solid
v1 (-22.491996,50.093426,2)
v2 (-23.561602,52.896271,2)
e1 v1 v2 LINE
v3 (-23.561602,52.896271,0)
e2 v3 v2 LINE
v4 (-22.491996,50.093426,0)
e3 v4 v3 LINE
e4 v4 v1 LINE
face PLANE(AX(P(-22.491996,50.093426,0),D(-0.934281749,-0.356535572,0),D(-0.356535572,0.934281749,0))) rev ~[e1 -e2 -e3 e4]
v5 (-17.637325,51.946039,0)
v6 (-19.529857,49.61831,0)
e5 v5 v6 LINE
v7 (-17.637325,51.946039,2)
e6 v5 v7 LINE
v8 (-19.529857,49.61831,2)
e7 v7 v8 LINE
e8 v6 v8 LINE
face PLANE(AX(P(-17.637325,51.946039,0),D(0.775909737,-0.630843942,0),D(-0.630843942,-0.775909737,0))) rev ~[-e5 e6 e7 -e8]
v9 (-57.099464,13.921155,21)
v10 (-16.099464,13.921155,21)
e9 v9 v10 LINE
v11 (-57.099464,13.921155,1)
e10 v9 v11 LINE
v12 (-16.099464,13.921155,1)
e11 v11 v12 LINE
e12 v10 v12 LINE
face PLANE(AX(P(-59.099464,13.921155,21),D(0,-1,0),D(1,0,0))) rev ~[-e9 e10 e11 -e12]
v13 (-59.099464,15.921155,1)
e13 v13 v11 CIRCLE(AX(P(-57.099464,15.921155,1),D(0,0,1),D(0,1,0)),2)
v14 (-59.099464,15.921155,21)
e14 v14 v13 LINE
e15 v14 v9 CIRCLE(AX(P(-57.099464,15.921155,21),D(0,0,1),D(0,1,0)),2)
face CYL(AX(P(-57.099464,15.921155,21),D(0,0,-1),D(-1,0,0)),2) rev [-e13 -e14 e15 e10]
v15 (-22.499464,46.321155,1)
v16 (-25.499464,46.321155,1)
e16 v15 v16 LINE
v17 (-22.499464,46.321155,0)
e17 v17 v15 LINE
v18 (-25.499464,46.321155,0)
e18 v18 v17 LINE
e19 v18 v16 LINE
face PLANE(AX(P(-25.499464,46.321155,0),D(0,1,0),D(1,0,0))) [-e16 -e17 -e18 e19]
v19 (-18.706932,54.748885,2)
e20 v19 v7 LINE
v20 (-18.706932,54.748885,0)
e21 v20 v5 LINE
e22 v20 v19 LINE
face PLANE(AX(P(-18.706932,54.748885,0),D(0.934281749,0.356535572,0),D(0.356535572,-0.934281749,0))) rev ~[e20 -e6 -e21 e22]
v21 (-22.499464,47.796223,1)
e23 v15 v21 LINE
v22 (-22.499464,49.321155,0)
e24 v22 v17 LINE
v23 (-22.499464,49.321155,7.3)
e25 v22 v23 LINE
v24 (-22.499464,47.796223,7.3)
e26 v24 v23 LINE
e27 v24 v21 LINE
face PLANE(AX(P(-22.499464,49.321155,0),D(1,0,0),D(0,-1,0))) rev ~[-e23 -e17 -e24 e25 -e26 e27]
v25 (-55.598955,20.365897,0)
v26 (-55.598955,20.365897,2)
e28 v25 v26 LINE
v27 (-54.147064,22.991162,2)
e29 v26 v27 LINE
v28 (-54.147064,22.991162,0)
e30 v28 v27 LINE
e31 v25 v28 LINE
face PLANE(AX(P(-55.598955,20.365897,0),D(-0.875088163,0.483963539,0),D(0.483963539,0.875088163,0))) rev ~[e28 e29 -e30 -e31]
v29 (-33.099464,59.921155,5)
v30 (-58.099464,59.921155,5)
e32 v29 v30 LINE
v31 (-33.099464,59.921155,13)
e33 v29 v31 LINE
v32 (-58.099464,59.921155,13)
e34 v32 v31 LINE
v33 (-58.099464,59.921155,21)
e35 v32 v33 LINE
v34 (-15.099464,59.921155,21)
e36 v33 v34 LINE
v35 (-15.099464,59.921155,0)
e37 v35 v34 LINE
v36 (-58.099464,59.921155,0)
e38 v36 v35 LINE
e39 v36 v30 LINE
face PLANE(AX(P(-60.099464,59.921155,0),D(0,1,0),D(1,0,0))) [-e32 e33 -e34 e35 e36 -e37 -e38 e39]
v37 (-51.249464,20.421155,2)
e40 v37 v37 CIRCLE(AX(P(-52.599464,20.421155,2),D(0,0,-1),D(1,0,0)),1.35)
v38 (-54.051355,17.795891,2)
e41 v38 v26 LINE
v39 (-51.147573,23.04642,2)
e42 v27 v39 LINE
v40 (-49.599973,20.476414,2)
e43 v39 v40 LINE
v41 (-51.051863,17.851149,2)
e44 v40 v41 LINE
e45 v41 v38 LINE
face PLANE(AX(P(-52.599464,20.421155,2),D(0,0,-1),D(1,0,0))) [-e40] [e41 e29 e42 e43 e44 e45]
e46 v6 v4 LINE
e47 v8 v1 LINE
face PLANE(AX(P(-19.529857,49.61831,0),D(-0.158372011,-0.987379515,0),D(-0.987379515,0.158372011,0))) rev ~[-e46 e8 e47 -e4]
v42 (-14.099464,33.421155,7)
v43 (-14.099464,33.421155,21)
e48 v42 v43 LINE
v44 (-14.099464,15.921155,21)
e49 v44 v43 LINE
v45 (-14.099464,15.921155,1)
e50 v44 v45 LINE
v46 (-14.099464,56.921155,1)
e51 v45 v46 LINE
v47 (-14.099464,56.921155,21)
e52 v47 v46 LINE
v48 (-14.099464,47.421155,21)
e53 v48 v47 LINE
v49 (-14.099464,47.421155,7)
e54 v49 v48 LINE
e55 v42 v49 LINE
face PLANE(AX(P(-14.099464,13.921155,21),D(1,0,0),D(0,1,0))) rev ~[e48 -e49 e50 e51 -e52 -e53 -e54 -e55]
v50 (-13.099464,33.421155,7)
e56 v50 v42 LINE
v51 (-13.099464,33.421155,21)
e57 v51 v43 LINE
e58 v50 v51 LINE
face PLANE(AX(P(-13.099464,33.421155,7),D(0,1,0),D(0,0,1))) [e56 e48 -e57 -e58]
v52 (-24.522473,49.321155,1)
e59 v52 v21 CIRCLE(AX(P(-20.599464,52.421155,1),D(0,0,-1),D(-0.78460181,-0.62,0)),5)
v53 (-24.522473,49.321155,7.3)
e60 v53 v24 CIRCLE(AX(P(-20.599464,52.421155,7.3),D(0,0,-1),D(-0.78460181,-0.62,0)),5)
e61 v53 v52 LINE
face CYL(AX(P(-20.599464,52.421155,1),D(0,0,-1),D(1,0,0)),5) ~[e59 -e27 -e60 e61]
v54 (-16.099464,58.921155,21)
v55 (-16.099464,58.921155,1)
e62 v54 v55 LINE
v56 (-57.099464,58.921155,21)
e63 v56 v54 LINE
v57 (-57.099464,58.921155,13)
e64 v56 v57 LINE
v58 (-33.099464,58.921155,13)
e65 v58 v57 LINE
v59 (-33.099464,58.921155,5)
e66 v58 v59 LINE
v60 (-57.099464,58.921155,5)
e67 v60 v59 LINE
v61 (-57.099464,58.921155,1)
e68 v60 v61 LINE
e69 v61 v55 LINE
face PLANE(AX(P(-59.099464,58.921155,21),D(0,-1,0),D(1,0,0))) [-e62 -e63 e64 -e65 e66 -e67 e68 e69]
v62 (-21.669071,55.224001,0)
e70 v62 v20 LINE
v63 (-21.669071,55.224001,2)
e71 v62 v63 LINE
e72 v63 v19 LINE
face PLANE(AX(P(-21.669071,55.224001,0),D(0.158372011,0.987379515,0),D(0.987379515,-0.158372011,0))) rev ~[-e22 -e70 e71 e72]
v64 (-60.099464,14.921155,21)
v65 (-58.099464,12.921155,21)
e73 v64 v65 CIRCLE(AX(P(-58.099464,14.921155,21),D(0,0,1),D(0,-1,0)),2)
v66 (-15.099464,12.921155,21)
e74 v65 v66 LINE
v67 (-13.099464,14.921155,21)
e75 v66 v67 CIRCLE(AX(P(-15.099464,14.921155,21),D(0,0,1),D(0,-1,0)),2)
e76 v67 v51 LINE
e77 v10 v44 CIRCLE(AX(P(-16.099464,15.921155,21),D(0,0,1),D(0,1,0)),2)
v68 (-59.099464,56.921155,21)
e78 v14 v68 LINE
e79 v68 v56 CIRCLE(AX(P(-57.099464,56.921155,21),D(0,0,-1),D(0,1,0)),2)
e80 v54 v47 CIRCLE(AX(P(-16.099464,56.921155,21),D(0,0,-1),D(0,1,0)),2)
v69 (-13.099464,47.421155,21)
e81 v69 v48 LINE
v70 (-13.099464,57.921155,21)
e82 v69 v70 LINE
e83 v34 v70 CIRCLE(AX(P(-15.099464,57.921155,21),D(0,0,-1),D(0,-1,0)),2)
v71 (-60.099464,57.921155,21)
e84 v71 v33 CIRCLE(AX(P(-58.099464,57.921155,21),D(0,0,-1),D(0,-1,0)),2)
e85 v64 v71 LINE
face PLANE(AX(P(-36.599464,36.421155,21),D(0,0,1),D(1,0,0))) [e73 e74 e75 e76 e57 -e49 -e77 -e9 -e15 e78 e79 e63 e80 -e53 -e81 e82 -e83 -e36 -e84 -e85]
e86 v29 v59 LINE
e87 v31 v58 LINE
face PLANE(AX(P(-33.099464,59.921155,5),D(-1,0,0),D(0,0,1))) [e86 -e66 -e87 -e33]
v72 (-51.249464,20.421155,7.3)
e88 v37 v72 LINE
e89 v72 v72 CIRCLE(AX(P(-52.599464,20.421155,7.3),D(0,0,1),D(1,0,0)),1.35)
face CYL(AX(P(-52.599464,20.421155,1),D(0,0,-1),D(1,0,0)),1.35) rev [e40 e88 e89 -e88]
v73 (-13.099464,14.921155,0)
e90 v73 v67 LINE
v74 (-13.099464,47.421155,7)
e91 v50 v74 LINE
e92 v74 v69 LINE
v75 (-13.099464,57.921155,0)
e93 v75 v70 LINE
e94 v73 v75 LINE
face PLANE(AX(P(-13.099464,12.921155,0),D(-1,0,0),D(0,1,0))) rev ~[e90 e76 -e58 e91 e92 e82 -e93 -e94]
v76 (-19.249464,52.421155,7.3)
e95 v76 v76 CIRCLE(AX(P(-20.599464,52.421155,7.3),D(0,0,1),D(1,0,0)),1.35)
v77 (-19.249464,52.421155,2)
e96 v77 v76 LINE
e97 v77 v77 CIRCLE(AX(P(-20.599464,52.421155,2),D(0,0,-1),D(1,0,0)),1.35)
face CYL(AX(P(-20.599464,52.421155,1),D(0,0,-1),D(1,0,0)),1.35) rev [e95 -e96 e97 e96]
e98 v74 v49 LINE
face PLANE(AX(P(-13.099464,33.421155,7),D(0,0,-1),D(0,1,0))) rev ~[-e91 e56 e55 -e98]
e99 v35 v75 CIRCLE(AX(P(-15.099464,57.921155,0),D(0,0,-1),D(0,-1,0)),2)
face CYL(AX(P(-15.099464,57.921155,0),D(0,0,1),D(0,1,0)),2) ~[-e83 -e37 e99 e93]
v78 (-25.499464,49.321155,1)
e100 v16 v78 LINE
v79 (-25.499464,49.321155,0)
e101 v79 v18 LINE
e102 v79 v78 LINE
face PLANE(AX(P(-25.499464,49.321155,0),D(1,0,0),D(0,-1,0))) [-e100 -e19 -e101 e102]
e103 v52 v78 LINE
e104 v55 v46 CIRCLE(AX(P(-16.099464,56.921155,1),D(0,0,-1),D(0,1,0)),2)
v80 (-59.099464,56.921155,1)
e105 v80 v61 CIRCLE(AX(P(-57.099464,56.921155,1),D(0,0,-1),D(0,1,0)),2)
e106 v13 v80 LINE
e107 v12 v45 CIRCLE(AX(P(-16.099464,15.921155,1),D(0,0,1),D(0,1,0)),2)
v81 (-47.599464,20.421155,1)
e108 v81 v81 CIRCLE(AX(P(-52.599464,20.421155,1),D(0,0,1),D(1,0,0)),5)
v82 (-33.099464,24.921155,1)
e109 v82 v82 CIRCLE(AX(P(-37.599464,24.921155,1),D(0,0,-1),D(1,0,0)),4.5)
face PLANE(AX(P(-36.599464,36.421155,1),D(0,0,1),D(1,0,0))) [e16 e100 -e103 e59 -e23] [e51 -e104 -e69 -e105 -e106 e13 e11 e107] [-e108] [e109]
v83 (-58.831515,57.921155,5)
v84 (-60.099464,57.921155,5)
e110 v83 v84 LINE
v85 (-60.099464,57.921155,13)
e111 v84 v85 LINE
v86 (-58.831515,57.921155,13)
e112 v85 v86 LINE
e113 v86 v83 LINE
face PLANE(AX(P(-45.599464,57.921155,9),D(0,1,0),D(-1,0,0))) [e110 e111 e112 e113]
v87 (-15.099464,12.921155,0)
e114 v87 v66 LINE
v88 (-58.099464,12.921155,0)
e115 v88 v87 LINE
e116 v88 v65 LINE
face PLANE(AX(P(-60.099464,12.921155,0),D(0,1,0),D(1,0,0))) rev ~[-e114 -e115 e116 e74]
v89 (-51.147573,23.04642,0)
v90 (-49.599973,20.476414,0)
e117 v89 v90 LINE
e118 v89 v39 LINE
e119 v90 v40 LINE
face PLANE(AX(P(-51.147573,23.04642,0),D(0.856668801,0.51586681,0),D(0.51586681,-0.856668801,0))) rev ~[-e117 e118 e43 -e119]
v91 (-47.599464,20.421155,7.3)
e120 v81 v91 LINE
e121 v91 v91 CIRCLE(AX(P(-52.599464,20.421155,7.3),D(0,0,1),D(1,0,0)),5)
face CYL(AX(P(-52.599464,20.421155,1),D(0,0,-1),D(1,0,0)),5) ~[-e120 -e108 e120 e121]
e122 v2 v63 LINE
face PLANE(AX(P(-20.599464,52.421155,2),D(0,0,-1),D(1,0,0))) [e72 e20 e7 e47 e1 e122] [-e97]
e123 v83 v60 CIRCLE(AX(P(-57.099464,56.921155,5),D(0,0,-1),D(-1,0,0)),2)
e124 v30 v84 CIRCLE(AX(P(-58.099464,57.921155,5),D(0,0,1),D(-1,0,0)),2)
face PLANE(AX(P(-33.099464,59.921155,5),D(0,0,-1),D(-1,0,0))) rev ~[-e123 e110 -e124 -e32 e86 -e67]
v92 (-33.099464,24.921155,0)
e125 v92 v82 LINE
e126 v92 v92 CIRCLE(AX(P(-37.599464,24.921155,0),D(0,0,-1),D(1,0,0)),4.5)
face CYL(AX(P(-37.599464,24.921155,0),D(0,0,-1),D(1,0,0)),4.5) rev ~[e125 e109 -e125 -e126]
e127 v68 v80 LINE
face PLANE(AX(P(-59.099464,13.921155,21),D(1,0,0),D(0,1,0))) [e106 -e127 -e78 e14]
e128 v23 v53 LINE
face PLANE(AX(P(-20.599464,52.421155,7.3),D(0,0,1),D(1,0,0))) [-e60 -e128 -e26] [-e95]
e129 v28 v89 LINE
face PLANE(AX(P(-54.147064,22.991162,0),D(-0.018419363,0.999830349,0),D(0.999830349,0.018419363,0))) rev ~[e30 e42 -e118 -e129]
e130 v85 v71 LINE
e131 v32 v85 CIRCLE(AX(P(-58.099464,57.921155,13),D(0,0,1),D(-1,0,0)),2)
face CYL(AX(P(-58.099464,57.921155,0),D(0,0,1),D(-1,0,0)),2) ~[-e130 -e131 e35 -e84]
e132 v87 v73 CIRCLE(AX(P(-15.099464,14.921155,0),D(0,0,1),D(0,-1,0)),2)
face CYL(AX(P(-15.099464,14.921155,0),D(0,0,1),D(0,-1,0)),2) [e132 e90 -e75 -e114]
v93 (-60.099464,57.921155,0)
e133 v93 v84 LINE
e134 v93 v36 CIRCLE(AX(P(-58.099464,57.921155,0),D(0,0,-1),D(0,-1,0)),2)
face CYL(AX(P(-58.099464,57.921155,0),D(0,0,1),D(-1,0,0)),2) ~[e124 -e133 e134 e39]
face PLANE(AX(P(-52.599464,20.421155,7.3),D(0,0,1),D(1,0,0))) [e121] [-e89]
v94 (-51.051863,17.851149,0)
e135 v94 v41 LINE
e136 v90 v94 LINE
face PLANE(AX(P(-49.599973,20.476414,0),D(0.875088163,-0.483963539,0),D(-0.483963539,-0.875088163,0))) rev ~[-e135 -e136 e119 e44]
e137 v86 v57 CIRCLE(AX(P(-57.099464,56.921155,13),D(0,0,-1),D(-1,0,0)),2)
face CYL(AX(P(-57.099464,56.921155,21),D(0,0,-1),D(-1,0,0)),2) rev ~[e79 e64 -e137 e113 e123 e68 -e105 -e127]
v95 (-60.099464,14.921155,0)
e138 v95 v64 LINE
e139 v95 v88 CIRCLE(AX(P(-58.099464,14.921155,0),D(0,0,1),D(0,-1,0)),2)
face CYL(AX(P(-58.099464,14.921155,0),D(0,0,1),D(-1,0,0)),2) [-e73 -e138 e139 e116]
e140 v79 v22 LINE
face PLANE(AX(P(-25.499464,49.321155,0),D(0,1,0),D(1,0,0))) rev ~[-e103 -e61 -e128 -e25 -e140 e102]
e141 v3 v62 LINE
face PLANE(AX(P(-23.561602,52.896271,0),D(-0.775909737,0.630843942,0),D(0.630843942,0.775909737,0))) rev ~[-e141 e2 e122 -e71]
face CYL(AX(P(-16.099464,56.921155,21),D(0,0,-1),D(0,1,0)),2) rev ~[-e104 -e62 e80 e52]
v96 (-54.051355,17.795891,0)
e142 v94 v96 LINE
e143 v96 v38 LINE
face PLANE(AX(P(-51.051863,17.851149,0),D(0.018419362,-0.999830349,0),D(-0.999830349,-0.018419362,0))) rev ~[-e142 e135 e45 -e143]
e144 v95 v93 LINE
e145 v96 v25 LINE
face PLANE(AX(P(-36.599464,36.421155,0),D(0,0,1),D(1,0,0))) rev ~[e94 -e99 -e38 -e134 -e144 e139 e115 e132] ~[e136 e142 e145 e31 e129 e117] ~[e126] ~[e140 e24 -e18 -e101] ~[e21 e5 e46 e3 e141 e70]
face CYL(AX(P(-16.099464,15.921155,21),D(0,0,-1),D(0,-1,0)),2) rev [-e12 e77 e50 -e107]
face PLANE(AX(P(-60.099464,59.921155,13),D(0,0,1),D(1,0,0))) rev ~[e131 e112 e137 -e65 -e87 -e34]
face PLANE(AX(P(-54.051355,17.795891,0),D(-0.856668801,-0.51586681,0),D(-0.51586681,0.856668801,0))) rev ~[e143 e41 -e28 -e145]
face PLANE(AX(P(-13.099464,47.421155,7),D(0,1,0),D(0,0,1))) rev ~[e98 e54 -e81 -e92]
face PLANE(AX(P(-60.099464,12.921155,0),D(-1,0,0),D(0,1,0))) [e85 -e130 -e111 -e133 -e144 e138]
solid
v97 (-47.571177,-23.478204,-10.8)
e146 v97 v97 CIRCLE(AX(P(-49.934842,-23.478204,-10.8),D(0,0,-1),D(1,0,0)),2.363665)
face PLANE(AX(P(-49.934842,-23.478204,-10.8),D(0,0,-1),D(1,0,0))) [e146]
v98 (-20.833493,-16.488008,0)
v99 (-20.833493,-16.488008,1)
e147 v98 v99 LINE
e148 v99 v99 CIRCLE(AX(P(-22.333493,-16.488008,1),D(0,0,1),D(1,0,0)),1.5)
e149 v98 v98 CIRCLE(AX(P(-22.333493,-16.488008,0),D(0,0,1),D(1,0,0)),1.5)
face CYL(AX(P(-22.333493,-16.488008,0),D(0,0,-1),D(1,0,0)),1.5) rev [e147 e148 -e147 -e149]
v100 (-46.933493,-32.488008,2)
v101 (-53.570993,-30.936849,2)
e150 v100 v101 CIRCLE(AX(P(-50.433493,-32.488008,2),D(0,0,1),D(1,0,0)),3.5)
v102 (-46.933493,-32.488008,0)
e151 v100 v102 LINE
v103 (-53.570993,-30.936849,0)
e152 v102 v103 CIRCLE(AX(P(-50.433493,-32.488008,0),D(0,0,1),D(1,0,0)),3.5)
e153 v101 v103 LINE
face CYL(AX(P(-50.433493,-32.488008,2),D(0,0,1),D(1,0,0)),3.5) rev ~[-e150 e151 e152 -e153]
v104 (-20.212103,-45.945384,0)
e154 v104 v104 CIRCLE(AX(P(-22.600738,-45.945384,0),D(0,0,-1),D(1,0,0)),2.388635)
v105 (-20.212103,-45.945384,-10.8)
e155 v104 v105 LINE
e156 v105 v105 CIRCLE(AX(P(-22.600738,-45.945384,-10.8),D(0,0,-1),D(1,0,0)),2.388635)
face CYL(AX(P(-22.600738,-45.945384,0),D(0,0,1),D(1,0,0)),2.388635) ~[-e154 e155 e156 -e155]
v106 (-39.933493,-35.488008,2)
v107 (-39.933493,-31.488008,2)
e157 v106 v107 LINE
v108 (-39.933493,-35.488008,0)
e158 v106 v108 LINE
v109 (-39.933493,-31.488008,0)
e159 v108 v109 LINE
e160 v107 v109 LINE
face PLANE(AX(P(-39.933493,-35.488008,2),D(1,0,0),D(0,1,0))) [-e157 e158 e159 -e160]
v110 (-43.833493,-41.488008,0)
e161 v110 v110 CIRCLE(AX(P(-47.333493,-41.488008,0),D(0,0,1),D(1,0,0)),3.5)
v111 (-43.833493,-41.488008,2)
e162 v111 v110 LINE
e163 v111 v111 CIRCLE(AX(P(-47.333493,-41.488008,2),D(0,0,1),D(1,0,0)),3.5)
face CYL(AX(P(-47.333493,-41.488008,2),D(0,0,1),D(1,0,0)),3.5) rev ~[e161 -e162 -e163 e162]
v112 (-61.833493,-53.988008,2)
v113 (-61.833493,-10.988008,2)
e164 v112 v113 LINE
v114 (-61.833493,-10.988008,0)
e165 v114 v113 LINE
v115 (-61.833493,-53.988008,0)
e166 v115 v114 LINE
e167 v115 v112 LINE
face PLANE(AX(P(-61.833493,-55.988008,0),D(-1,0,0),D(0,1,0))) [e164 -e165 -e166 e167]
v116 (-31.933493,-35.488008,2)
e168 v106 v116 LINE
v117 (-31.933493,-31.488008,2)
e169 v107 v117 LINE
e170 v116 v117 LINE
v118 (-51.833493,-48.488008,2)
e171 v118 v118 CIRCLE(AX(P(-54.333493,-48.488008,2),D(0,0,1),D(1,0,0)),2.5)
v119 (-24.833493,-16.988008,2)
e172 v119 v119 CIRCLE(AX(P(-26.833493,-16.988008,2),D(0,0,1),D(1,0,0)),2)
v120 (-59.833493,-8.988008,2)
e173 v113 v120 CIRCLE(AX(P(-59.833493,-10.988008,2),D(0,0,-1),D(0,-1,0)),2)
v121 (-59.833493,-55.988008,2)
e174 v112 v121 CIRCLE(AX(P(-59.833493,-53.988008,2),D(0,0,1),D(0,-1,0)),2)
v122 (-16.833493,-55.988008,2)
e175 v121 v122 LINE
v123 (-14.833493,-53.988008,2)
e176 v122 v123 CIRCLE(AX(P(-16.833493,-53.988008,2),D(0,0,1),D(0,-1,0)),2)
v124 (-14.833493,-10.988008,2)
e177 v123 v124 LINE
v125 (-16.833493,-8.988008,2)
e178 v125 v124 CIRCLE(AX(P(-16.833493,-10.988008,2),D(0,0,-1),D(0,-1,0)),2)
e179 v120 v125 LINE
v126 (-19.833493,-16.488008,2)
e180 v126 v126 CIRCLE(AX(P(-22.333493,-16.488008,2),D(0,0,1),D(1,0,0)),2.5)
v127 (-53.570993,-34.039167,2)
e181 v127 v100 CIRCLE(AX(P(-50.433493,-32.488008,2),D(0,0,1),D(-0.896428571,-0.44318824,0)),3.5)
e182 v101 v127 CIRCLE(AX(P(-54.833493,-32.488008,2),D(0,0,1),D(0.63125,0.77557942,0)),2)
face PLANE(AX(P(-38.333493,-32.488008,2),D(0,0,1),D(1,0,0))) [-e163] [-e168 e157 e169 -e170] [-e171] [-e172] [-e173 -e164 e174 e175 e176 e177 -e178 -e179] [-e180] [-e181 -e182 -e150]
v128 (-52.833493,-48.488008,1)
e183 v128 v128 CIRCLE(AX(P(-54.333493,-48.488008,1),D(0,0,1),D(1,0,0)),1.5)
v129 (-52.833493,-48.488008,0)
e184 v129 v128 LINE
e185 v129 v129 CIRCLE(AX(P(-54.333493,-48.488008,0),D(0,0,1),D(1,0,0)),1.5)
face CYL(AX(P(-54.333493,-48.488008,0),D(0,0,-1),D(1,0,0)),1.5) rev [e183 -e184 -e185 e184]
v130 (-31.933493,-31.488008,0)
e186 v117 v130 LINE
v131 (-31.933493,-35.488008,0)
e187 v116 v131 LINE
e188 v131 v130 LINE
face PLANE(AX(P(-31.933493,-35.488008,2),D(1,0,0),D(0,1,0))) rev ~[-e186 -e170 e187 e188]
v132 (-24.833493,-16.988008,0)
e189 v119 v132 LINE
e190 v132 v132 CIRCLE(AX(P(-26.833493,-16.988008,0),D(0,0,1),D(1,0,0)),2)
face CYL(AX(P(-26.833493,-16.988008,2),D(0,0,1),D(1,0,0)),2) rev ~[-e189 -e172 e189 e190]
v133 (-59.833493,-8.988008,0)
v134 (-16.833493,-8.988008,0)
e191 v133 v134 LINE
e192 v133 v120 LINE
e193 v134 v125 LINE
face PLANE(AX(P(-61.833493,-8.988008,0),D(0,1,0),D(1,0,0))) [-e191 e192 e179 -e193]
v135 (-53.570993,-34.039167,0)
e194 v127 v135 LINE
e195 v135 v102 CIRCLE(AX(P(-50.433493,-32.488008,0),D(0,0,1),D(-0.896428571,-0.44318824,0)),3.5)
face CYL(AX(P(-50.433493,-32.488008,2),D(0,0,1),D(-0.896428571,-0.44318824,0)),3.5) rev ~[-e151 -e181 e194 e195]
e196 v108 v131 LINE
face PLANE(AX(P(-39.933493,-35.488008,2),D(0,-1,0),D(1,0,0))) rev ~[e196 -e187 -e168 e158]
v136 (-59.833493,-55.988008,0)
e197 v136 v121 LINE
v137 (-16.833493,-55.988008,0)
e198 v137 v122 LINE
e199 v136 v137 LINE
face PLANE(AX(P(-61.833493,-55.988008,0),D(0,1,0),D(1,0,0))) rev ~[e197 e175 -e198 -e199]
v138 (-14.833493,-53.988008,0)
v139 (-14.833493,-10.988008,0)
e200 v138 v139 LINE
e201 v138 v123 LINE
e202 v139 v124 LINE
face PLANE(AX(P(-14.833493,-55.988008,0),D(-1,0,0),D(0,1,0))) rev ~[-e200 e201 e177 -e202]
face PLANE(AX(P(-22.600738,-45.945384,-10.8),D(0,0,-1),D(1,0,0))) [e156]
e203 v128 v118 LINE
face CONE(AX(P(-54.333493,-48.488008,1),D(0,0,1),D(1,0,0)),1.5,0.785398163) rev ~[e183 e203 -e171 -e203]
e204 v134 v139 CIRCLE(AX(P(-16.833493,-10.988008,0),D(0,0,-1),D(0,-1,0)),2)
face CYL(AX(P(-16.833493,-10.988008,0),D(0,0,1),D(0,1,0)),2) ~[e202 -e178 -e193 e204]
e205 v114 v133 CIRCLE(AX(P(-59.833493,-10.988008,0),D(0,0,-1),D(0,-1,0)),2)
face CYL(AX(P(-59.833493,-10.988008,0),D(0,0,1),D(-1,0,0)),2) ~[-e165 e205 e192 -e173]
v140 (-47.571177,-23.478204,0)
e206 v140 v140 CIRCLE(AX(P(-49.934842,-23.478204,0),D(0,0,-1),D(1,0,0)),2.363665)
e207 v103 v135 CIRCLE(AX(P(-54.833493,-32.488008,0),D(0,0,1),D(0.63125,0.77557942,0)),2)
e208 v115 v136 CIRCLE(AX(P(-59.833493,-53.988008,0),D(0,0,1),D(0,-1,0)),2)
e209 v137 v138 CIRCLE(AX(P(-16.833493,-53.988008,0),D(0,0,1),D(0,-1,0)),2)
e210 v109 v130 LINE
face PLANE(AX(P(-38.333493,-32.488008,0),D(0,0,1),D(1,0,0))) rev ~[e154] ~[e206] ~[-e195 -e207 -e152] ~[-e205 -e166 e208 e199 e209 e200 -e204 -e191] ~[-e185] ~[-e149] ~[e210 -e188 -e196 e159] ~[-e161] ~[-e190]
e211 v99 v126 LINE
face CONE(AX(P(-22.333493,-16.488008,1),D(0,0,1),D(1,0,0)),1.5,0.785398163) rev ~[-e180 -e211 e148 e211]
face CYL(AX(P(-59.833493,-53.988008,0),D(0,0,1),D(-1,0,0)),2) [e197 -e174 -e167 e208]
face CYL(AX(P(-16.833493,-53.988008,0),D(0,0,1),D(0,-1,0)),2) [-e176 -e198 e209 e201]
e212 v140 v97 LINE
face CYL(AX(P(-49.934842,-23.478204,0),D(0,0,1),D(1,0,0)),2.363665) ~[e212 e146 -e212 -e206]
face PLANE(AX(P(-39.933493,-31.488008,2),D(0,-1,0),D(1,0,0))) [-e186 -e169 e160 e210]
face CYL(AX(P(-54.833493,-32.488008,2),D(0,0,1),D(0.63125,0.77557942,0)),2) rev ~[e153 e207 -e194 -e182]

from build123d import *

# Parameters (mm, degrees)
F0_W      = 47
F0_H      = 47
F1_DEPTH  = 21
F2_W      = 45
F2_H      = 45
F3_DEPTH  = 20
F5_R      = 2.5
F5_R_2    = 1.35
F6_DEPTH  = 6.3
F7_DEPTH  = 2
F8_R      = 5
F8_R_2    = 2.5
F9_DEPTH  = 6.3
F10_R     = 1.35
F11_DEPTH = 2
F12_W     = 47
F12_H     = 47
F12_R     = 1.5
F12_R_2   = 2.5
F13_DEPTH = 2
F14_SIZE  = 1
F15_R     = 2
F16_R     = 2
F17_W     = 25
F17_H     = 8
F17_W_2   = 2
F18_DEPTH = 2
F19_W     = 14
F19_H     = 14
F20_DEPTH = 3
F21_R     = 3.5
F21_R_2   = 2
F21_W     = 8
F21_H     = 4
F22_DEPTH = 5
F23_R     = 4.5
F23_W     = 3
F23_H     = 3
F24_DEPTH = 10
F25_R     = 2.3636646969
F25_R_2   = 2.3886353596
F26_DEPTH = 10.8


with BuildPart() as f1:
    # F0 (on Top) → F1 (new body)
    with BuildSketch(Plane.XY):
        with Locations((-36.5994639099, 36.4211554304)):
            Rectangle(F0_W, F0_H)
    extrude(amount=F1_DEPTH)

    # F2 (on face) → F3 (cut)
    with BuildSketch(Plane.XY.offset(21)):
        with Locations((-36.5994639099, 36.4211554304)):
            Rectangle(F2_W, F2_H)
    extrude(amount=-F3_DEPTH, mode=Mode.SUBTRACT)

    # F5 (on face) → F6 (join)
    with BuildSketch(Plane.XY.offset(1)):
        with Locations((-52.5994639099, 20.4211554304)):
            Circle(F5_R)
        with Locations((-52.5994639099, 20.4211554304)):
            Circle(F5_R_2, mode=Mode.SUBTRACT)
        with Locations((-20.5994639099, 52.4211554304)):
            Circle(F5_R)
        with Locations((-20.5994639099, 52.4211554304)):
            Circle(F5_R_2, mode=Mode.SUBTRACT)
    extrude(amount=F6_DEPTH)

    # F7 (cut): faces of the model
    f7_faces = [f1.faces().sort_by_distance(p)[0] for p in [
        (-52.5994639099, 20.4211554304, 1),
        (-20.5994639099, 52.4211554304, 1),
    ]]
    extrude(f7_faces, amount=-F7_DEPTH, mode=Mode.SUBTRACT)

    # F8 (on face) → F9 (join)
    with BuildSketch(Plane.XY.offset(1)):
        with Locations((-52.5994639099, 20.4211554304)):
            Circle(F8_R)
        with Locations((-52.5994639099, 20.4211554304)):
            Circle(F8_R_2, mode=Mode.SUBTRACT)
        with Locations((-20.5994639099, 52.4211554304)):
            Circle(F8_R)
        with Locations((-20.5994639099, 52.4211554304)):
            Circle(F8_R_2, mode=Mode.SUBTRACT)
    extrude(amount=F9_DEPTH)

    # F10 (on face) → F11 (cut)
    with BuildSketch(Plane(origin=(0, 0, 0), x_dir=(1, 0, 0), z_dir=(0, 0, -1))):
        Polygon((-49.5999728624, -20.4764135179), (-51.0518634785, -17.8511490286), (-54.051354526, -17.7958909411), (-55.5989549573, -20.3658973428), (-54.1470643412, -22.9911618321), (-51.1475732937, -23.0464199197), align=None)
        with Locations((-52.5994639099, -20.4211554304)):
            Circle(F10_R, mode=Mode.SUBTRACT)
        Polygon((-18.7069320828, -54.7488846422), (-17.6373253658, -51.9460393966), (-19.5298571928, -49.6183101848), (-22.4919957369, -50.0934262185), (-23.561602454, -52.8962714641), (-21.669070627, -55.224000676), align=None)
        with Locations((-20.5994639099, -52.4211554304)):
            Circle(F10_R, mode=Mode.SUBTRACT)
    extrude(amount=-F11_DEPTH, mode=Mode.SUBTRACT)

    # F16
    f16_edges = [f1.edges().sort_by_distance(p)[0] for p in [
        (-60.099464, 12.921155, 10.5),
        (-13.099464, 59.921155, 10.5),
        (-13.099464, 12.921155, 10.5),
        (-59.099464, 13.921155, 11),
        (-14.099464, 13.921155, 11),
        (-59.099464, 58.921155, 11),
        (-14.099464, 58.921155, 11),
        (-60.099464, 59.921155, 10.5),
    ]]
    fillet(f16_edges, radius=F16_R)

    # F17 (on face) → F18 (cut)
    with BuildSketch(Plane(origin=(0, 59.9211554304, 0), x_dir=(-1, 0, 0), z_dir=(0, 1, 0))):
        with Locations((45.5994639099, 9)):
            Rectangle(F17_W, F17_H)
        with Locations((59.0994639099, 9)):
            Rectangle(F17_W_2, F17_H)
    extrude(amount=-F18_DEPTH, mode=Mode.SUBTRACT)

    # F19 (on face) → F20 (cut)
    with BuildSketch(Plane.YZ.offset(-13.0994639099)):
        with Locations((40.4211554304, 14)):
            Rectangle(F19_W, F19_H)
    extrude(amount=-F20_DEPTH, mode=Mode.SUBTRACT)

    # F23 (on face) → F24 (cut)
    with BuildSketch(Plane(origin=(0, 0, 0), x_dir=(1, 0, 0), z_dir=(0, 0, -1))):
        with Locations((-37.5994639099, -24.9211554304)):
            Circle(F23_R)
        with Locations((-23.9994639099, -47.8211554304)):
            Rectangle(F23_W, F23_H)
    extrude(amount=-F24_DEPTH, mode=Mode.SUBTRACT)


with BuildPart() as f13:
    # F12 (on Top) → F13 (new body)
    with BuildSketch(Plane.XY):
        with Locations((-38.3334934391, -32.4880076721)):
            Rectangle(F12_W, F12_H)
        with Locations((-58.3334934391, -52.4880076721)):
            Circle(F12_R, mode=Mode.SUBTRACT)
        with Locations((-54.3334934391, -48.4880076721)):
            Circle(F12_R_2, mode=Mode.SUBTRACT)
        with Locations((-18.3334934391, -52.4880076721)):
            Circle(F12_R, mode=Mode.SUBTRACT)
        with Locations((-58.3334934391, -12.4880076721)):
            Circle(F12_R, mode=Mode.SUBTRACT)
        with Locations((-22.3334934391, -16.4880076721)):
            Circle(F12_R_2, mode=Mode.SUBTRACT)
        with Locations((-18.3334934391, -12.4880076721)):
            Circle(F12_R, mode=Mode.SUBTRACT)
        with Locations((-58.3334934391, -12.4880076721)):
            Circle(F12_R)
        with Locations((-18.3334934391, -12.4880076721)):
            Circle(F12_R)
        with Locations((-18.3334934391, -52.4880076721)):
            Circle(F12_R)
        with Locations((-58.3334934391, -52.4880076721)):
            Circle(F12_R)
        with Locations((-22.3334934391, -16.4880076721)):
            Circle(F12_R_2)
        with Locations((-22.3334934391, -16.4880076721)):
            Circle(F12_R, mode=Mode.SUBTRACT)
        with Locations((-54.3334934391, -48.4880076721)):
            Circle(F12_R_2)
        with Locations((-54.3334934391, -48.4880076721)):
            Circle(F12_R, mode=Mode.SUBTRACT)
    extrude(amount=F13_DEPTH)

    # F14
    f14_edges = [f13.edges().sort_by_distance(p)[0] for p in [
        (-23.833493, -16.488008, 2),
        (-55.833493, -48.488008, 2),
    ]]
    chamfer(f14_edges, length=F14_SIZE)

    # F15
    f15_edges = [f13.edges().sort_by_distance(p)[0] for p in [
        (-61.833493, -55.988008, 1),
        (-61.833493, -8.988008, 1),
        (-14.833493, -8.988008, 1),
        (-14.833493, -55.988008, 1),
    ]]
    fillet(f15_edges, radius=F15_R)

    # F21 (on face) → F22 (cut)
    with BuildSketch(Plane.XY.offset(2)):
        with Locations((-47.3334934391, -41.4880076721)):
            Circle(F21_R)
        with Locations((-26.8334934391, -16.9880076721)):
            Circle(F21_R_2)
        with Locations((-35.9334934391, -33.4880076721)):
            Rectangle(F21_W, F21_H)
        with BuildLine():
            ThreePointArc((-53.5709934391, -34.0391665131), (-49.637016823, -35.8961780024), (-46.9334934391, -32.4880076721))
            ThreePointArc((-46.9334934391, -32.4880076721), (-49.637016823, -29.0798373419), (-53.5709934391, -30.9368488311))
            ThreePointArc((-53.5709934391, -30.9368488311), (-53.0272542523, -31.6292294703), (-52.8334934391, -32.4880076721))
            ThreePointArc((-52.8334934391, -32.4880076721), (-53.0272542523, -33.346785874), (-53.5709934391, -34.0391665131))
        make_face()
        with BuildLine():
            ThreePointArc((-52.8334934391, -32.4880076721), (-53.0272542523, -31.6292294703), (-53.5709934391, -30.9368488311))
            ThreePointArc((-53.5709934391, -30.9368488311), (-53.9334934391, -32.4880076721), (-53.5709934391, -34.0391665131))
            ThreePointArc((-53.5709934391, -34.0391665131), (-53.0272542523, -33.346785874), (-52.8334934391, -32.4880076721))
        make_face()
        with BuildLine():
            ThreePointArc((-53.5709934391, -34.0391665131), (-53.9334934391, -32.4880076721), (-53.5709934391, -30.9368488311))
            ThreePointArc((-53.5709934391, -30.9368488311), (-56.8334934391, -32.4880076721), (-53.5709934391, -34.0391665131))
        make_face()
    extrude(amount=-F22_DEPTH, mode=Mode.SUBTRACT)

    # F25 (on face) → F26 (join)
    with BuildSketch(Plane(origin=(0, 0, 0), x_dir=(1, 0, 0), z_dir=(0, 0, -1))):
        with Locations((-49.9348416924, 23.4782043844)):
            Circle(F25_R)
        with Locations((-22.6007383317, 45.9453836083)):
            Circle(F25_R_2)
    extrude(amount=F26_DEPTH)


solid = Compound([f1.part, f13.part])
